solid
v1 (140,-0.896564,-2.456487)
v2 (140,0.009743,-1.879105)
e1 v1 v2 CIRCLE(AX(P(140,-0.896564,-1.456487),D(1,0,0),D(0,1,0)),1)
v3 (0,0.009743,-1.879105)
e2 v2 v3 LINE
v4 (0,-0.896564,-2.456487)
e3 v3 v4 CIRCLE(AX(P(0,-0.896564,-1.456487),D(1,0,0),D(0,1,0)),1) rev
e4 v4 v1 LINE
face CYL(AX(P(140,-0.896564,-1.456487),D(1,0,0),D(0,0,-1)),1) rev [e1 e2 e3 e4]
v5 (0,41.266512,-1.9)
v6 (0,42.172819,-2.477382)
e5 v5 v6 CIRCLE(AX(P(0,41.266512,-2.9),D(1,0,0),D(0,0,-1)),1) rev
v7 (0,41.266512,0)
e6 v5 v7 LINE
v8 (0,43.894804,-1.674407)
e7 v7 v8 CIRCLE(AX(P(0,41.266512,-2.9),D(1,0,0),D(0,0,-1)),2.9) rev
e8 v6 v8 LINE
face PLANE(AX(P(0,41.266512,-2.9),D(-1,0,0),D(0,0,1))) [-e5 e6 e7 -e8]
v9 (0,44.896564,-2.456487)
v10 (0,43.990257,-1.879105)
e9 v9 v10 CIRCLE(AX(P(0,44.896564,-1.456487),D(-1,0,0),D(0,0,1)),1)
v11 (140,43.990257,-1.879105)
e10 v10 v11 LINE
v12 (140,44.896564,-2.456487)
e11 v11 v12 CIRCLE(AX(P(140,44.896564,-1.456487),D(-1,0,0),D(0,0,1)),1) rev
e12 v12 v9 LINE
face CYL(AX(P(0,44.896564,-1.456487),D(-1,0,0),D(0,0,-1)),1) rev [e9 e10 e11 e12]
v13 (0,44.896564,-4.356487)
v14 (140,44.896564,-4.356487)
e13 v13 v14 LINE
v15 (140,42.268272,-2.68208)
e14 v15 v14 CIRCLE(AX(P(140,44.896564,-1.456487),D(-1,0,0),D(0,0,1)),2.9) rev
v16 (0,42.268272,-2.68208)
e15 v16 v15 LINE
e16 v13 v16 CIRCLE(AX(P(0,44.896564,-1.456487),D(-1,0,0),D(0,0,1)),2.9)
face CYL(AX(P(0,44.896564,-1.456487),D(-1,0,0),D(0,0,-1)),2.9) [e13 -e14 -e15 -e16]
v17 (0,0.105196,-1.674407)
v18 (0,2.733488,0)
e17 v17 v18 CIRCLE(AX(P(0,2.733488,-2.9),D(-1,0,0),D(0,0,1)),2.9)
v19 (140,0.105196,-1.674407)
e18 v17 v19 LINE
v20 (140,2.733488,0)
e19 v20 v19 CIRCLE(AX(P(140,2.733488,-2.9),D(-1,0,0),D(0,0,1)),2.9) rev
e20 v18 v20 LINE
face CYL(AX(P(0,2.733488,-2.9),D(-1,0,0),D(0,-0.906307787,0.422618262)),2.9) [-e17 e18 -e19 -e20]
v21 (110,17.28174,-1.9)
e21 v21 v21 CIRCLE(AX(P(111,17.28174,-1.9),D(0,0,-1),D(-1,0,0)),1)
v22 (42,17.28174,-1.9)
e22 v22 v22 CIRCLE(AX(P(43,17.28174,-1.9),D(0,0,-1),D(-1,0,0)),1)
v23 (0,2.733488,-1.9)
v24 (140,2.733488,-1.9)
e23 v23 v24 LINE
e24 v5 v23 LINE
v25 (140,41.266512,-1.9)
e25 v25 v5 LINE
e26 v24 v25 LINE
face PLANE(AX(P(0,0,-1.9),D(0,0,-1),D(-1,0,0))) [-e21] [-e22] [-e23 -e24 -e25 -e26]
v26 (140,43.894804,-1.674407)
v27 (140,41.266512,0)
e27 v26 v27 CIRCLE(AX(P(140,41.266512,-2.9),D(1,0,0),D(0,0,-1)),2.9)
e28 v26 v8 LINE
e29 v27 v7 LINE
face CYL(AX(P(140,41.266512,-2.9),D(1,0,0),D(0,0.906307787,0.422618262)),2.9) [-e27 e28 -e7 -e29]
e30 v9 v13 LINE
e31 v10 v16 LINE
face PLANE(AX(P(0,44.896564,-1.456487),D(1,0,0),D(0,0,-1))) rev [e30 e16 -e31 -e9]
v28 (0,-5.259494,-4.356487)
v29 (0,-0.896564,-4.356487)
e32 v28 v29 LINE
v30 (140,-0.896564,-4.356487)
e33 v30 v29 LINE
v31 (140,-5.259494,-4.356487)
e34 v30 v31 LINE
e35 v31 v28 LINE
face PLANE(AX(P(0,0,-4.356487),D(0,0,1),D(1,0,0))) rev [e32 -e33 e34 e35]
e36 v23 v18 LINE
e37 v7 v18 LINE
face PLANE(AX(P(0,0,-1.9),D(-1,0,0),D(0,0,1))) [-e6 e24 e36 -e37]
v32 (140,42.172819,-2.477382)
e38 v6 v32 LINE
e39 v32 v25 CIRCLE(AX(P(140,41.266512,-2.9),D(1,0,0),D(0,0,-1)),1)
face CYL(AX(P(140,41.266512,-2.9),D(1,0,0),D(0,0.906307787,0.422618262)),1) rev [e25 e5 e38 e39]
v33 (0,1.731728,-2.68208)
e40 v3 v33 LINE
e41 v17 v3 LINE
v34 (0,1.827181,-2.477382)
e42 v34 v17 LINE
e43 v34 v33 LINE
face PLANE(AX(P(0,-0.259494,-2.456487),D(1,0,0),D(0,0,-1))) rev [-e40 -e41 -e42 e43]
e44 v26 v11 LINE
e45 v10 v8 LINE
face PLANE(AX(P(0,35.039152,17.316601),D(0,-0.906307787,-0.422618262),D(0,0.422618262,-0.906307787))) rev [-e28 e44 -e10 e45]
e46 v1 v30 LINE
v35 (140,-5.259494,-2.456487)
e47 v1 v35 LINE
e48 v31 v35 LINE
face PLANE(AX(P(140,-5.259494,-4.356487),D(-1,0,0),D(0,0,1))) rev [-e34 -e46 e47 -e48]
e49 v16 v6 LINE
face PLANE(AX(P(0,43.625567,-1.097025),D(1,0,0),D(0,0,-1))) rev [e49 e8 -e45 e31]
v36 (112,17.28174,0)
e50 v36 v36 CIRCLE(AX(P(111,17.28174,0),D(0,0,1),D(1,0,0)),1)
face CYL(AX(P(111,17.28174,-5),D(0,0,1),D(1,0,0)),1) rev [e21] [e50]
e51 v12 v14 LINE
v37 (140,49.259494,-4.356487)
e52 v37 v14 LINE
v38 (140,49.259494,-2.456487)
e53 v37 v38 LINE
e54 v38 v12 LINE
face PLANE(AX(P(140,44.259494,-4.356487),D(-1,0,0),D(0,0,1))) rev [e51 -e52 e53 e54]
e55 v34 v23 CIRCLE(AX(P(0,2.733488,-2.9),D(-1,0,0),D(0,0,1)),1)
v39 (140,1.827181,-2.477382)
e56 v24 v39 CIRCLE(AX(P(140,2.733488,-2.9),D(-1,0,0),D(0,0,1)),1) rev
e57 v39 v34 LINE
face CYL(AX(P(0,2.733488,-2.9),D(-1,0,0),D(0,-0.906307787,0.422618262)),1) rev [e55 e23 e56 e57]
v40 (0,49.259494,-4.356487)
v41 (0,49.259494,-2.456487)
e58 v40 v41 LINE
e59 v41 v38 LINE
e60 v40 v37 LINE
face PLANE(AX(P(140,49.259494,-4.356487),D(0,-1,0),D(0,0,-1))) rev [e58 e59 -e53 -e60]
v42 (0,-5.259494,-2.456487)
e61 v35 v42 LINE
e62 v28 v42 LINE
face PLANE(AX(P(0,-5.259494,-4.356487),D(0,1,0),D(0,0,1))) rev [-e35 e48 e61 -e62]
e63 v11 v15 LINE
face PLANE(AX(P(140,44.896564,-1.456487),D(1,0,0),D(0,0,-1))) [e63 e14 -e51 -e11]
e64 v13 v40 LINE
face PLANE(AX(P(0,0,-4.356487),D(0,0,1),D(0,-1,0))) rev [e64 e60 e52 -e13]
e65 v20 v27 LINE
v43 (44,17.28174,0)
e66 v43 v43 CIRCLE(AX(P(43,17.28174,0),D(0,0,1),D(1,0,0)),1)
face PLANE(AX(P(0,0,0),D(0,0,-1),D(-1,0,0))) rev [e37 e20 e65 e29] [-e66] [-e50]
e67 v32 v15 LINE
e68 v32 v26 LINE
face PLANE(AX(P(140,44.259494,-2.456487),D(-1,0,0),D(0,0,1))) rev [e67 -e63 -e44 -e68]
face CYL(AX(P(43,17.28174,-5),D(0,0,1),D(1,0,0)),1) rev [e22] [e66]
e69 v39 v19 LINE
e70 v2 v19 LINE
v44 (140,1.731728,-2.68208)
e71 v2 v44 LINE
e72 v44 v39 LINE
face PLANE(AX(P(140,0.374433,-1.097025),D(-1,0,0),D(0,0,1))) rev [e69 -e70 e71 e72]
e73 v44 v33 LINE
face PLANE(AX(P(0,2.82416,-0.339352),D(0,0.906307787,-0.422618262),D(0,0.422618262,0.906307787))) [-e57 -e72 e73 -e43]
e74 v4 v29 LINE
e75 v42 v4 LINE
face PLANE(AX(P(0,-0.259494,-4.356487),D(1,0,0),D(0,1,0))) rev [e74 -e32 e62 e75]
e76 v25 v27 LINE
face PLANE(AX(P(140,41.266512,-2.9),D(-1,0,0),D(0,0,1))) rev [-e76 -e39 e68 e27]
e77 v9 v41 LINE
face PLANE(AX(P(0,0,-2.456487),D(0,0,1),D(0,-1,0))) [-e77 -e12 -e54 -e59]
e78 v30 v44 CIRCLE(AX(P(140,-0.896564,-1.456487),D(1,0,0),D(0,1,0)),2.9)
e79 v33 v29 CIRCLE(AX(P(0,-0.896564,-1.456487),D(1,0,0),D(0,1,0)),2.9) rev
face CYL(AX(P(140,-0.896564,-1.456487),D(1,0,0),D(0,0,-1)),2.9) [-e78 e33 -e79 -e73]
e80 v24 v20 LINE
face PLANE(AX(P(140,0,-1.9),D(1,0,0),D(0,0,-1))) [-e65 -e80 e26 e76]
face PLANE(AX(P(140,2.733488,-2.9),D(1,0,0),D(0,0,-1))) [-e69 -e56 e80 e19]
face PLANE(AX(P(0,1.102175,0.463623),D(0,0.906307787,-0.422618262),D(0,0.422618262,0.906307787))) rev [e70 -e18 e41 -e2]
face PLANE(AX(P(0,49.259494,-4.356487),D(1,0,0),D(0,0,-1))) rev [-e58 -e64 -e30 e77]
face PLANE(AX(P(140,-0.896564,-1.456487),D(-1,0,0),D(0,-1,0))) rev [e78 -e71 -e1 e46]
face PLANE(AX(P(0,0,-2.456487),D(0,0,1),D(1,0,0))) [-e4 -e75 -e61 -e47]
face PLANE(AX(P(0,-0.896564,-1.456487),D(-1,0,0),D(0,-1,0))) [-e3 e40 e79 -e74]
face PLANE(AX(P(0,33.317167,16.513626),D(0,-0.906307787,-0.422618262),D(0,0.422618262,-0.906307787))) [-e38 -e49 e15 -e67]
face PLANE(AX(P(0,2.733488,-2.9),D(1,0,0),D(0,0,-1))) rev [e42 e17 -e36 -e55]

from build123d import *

# Parameters (mm, degrees)
SKETCH1_W                      = 140
SKETCH1_H                      = 44
BASE_FLANGE1_DEPTH             = 1.9
EDGE_FLANGE1_DEPTH             = 140
EDGE_FLANGE1_2_DEPTH           = 140
EDGE_FLANGE2_STRIP_CUT_DEPTH   = 140
EDGE_FLANGE2_STRIP_CUT_2_DEPTH = 140
EDGE_FLANGE2_DEPTH             = 140
EDGE_FLANGE2_BEND_DEPTH        = 140
SKETCH40_R                     = 1
CUT_EXTRUDE1_DEPTH             = 5


# Read off the part's stored shape, not the designer's step: Edge-Flange1
# Sheet-metal steps are written as plain solids
with BuildPart() as part:
    # Sketch1 → Base-Flange1 (new body)
    with BuildSketch(Plane.XY):
        with Locations((70, 22)):
            Rectangle(SKETCH1_W, SKETCH1_H)
    extrude(amount=-BASE_FLANGE1_DEPTH)

    # Edge-Flange1 outline → Edge-Flange1 (cut)
    with BuildSketch(Plane.YZ):
        with BuildLine():
            ThreePointArc((41.266511693, 0), (42.824680557, -0.454164807), (43.894804276, -1.674407041))
            Line((43.894804276, -1.674407041), (44, -1.9))
            Line((44, -1.9), (44, 0))
            Line((44, 0), (41.266511693, 0))
        make_face()
        with BuildLine():
            ThreePointArc((0.105195724, -1.674407041), (1.175319443, -0.454164807), (2.733488307, 0))
            Line((2.733488307, 0), (0, 0))
            Line((0, 0), (0, -1.9))
            Line((0, -1.9), (0.105195724, -1.674407041))
        make_face()
    extrude(amount=EDGE_FLANGE1_DEPTH, mode=Mode.SUBTRACT)

    # Edge-Flange1 2 outline → Edge-Flange1 2 (add)
    with BuildSketch(Plane.YZ):
        with BuildLine():
            Line((44.259494142, -2.456486983), (44, -1.9))
            Line((44, -1.9), (41.266511693, -1.9))
            ThreePointArc((41.266511693, -1.9), (41.803811302, -2.056608554), (42.17281948, -2.477381738))
            Line((42.17281948, -2.477381738), (42.537509347, -3.259461681))
            Line((42.537509347, -3.259461681), (44.259494142, -2.456486983))
        make_face()
        with BuildLine():
            ThreePointArc((1.82718052, -2.477381738), (2.196188698, -2.056608554), (2.733488307, -1.9))
            Line((2.733488307, -1.9), (0, -1.9))
            Line((0, -1.9), (-0.259494142, -2.456486983))
            Line((-0.259494142, -2.456486983), (1.462490653, -3.259461681))
            Line((1.462490653, -3.259461681), (1.82718052, -2.477381738))
        make_face()
    extrude(amount=EDGE_FLANGE1_2_DEPTH)

    # Edge-Flange2 strip (across the edge) → Edge-Flange2 strip cut (cut)
    with BuildSketch(Plane(origin=(140, 44.259494142, -2.456486983), x_dir=(0, 0, 1), z_dir=(-1, 0, 0))):
        Polygon((-8.926147715, 2.065912991), (-0.225592959, -1.991222322), (0.577381738, -0.269237526), (-8.123173017, 3.787897786), align=None)
    extrude(amount=EDGE_FLANGE2_STRIP_CUT_DEPTH, mode=Mode.SUBTRACT)

    # Edge-Flange2 strip 2 (across the edge) → Edge-Flange2 strip cut 2 (cut)
    with BuildSketch(Plane(origin=(0, -0.259494142, -2.456486983), x_dir=(0, 0, 1), z_dir=(1, 0, 0))):
        Polygon((-8.926147715, 2.065912991), (-0.225592959, -1.991222322), (0.577381738, -0.269237526), (-8.123173017, 3.787897786), align=None)
    extrude(amount=EDGE_FLANGE2_STRIP_CUT_2_DEPTH, mode=Mode.SUBTRACT)

    # Edge-Flange2 section (across the edge) → Edge-Flange2 (add)
    with BuildSketch(Plane(origin=(140, 44.259494142, -2.456486983), x_dir=(0, 0, 1), z_dir=(-1, 0, 0))):
        with BuildLine():
            Line((-1.9, 0.637070261), (-1.9, 5))
            Line((-1.9, 5), (0, 5))
            Line((0, 5), (0, 0.637070261))
            ThreePointArc((0, 0.637070261), (0.156608554, 0.099770652), (0.577381738, -0.269237526))
            Line((0.577381738, -0.269237526), (-0.225592959, -1.991222322))
            ThreePointArc((-0.225592959, -1.991222322), (-1.445835193, -0.921098603), (-1.9, 0.637070261))
        make_face()
    extrude(amount=EDGE_FLANGE2_DEPTH)

    # Edge-Flange2 section 2 (across the edge) → Edge-Flange2 bend (add)
    with BuildSketch(Plane(origin=(0, -0.259494142, -2.456486983), x_dir=(0, 0, 1), z_dir=(1, 0, 0))):
        with BuildLine():
            Line((-1.9, 0.637070261), (-1.9, 5))
            Line((-1.9, 5), (0, 5))
            Line((0, 5), (0, 0.637070261))
            ThreePointArc((0, 0.637070261), (0.156608554, 0.099770652), (0.577381738, -0.269237526))
            Line((0.577381738, -0.269237526), (-0.225592959, -1.991222322))
            ThreePointArc((-0.225592959, -1.991222322), (-1.445835193, -0.921098603), (-1.9, 0.637070261))
        make_face()
    extrude(amount=EDGE_FLANGE2_BEND_DEPTH)

    # Sketch40 → Cut-Extrude1 (cut)
    with BuildSketch(Plane.XY):
        with Locations((111, 17.28174)):
            Circle(SKETCH40_R)
        with Locations((43, 17.28174)):
            Circle(SKETCH40_R)
    extrude(amount=-CUT_EXTRUDE1_DEPTH, mode=Mode.SUBTRACT)


solid = part.part
